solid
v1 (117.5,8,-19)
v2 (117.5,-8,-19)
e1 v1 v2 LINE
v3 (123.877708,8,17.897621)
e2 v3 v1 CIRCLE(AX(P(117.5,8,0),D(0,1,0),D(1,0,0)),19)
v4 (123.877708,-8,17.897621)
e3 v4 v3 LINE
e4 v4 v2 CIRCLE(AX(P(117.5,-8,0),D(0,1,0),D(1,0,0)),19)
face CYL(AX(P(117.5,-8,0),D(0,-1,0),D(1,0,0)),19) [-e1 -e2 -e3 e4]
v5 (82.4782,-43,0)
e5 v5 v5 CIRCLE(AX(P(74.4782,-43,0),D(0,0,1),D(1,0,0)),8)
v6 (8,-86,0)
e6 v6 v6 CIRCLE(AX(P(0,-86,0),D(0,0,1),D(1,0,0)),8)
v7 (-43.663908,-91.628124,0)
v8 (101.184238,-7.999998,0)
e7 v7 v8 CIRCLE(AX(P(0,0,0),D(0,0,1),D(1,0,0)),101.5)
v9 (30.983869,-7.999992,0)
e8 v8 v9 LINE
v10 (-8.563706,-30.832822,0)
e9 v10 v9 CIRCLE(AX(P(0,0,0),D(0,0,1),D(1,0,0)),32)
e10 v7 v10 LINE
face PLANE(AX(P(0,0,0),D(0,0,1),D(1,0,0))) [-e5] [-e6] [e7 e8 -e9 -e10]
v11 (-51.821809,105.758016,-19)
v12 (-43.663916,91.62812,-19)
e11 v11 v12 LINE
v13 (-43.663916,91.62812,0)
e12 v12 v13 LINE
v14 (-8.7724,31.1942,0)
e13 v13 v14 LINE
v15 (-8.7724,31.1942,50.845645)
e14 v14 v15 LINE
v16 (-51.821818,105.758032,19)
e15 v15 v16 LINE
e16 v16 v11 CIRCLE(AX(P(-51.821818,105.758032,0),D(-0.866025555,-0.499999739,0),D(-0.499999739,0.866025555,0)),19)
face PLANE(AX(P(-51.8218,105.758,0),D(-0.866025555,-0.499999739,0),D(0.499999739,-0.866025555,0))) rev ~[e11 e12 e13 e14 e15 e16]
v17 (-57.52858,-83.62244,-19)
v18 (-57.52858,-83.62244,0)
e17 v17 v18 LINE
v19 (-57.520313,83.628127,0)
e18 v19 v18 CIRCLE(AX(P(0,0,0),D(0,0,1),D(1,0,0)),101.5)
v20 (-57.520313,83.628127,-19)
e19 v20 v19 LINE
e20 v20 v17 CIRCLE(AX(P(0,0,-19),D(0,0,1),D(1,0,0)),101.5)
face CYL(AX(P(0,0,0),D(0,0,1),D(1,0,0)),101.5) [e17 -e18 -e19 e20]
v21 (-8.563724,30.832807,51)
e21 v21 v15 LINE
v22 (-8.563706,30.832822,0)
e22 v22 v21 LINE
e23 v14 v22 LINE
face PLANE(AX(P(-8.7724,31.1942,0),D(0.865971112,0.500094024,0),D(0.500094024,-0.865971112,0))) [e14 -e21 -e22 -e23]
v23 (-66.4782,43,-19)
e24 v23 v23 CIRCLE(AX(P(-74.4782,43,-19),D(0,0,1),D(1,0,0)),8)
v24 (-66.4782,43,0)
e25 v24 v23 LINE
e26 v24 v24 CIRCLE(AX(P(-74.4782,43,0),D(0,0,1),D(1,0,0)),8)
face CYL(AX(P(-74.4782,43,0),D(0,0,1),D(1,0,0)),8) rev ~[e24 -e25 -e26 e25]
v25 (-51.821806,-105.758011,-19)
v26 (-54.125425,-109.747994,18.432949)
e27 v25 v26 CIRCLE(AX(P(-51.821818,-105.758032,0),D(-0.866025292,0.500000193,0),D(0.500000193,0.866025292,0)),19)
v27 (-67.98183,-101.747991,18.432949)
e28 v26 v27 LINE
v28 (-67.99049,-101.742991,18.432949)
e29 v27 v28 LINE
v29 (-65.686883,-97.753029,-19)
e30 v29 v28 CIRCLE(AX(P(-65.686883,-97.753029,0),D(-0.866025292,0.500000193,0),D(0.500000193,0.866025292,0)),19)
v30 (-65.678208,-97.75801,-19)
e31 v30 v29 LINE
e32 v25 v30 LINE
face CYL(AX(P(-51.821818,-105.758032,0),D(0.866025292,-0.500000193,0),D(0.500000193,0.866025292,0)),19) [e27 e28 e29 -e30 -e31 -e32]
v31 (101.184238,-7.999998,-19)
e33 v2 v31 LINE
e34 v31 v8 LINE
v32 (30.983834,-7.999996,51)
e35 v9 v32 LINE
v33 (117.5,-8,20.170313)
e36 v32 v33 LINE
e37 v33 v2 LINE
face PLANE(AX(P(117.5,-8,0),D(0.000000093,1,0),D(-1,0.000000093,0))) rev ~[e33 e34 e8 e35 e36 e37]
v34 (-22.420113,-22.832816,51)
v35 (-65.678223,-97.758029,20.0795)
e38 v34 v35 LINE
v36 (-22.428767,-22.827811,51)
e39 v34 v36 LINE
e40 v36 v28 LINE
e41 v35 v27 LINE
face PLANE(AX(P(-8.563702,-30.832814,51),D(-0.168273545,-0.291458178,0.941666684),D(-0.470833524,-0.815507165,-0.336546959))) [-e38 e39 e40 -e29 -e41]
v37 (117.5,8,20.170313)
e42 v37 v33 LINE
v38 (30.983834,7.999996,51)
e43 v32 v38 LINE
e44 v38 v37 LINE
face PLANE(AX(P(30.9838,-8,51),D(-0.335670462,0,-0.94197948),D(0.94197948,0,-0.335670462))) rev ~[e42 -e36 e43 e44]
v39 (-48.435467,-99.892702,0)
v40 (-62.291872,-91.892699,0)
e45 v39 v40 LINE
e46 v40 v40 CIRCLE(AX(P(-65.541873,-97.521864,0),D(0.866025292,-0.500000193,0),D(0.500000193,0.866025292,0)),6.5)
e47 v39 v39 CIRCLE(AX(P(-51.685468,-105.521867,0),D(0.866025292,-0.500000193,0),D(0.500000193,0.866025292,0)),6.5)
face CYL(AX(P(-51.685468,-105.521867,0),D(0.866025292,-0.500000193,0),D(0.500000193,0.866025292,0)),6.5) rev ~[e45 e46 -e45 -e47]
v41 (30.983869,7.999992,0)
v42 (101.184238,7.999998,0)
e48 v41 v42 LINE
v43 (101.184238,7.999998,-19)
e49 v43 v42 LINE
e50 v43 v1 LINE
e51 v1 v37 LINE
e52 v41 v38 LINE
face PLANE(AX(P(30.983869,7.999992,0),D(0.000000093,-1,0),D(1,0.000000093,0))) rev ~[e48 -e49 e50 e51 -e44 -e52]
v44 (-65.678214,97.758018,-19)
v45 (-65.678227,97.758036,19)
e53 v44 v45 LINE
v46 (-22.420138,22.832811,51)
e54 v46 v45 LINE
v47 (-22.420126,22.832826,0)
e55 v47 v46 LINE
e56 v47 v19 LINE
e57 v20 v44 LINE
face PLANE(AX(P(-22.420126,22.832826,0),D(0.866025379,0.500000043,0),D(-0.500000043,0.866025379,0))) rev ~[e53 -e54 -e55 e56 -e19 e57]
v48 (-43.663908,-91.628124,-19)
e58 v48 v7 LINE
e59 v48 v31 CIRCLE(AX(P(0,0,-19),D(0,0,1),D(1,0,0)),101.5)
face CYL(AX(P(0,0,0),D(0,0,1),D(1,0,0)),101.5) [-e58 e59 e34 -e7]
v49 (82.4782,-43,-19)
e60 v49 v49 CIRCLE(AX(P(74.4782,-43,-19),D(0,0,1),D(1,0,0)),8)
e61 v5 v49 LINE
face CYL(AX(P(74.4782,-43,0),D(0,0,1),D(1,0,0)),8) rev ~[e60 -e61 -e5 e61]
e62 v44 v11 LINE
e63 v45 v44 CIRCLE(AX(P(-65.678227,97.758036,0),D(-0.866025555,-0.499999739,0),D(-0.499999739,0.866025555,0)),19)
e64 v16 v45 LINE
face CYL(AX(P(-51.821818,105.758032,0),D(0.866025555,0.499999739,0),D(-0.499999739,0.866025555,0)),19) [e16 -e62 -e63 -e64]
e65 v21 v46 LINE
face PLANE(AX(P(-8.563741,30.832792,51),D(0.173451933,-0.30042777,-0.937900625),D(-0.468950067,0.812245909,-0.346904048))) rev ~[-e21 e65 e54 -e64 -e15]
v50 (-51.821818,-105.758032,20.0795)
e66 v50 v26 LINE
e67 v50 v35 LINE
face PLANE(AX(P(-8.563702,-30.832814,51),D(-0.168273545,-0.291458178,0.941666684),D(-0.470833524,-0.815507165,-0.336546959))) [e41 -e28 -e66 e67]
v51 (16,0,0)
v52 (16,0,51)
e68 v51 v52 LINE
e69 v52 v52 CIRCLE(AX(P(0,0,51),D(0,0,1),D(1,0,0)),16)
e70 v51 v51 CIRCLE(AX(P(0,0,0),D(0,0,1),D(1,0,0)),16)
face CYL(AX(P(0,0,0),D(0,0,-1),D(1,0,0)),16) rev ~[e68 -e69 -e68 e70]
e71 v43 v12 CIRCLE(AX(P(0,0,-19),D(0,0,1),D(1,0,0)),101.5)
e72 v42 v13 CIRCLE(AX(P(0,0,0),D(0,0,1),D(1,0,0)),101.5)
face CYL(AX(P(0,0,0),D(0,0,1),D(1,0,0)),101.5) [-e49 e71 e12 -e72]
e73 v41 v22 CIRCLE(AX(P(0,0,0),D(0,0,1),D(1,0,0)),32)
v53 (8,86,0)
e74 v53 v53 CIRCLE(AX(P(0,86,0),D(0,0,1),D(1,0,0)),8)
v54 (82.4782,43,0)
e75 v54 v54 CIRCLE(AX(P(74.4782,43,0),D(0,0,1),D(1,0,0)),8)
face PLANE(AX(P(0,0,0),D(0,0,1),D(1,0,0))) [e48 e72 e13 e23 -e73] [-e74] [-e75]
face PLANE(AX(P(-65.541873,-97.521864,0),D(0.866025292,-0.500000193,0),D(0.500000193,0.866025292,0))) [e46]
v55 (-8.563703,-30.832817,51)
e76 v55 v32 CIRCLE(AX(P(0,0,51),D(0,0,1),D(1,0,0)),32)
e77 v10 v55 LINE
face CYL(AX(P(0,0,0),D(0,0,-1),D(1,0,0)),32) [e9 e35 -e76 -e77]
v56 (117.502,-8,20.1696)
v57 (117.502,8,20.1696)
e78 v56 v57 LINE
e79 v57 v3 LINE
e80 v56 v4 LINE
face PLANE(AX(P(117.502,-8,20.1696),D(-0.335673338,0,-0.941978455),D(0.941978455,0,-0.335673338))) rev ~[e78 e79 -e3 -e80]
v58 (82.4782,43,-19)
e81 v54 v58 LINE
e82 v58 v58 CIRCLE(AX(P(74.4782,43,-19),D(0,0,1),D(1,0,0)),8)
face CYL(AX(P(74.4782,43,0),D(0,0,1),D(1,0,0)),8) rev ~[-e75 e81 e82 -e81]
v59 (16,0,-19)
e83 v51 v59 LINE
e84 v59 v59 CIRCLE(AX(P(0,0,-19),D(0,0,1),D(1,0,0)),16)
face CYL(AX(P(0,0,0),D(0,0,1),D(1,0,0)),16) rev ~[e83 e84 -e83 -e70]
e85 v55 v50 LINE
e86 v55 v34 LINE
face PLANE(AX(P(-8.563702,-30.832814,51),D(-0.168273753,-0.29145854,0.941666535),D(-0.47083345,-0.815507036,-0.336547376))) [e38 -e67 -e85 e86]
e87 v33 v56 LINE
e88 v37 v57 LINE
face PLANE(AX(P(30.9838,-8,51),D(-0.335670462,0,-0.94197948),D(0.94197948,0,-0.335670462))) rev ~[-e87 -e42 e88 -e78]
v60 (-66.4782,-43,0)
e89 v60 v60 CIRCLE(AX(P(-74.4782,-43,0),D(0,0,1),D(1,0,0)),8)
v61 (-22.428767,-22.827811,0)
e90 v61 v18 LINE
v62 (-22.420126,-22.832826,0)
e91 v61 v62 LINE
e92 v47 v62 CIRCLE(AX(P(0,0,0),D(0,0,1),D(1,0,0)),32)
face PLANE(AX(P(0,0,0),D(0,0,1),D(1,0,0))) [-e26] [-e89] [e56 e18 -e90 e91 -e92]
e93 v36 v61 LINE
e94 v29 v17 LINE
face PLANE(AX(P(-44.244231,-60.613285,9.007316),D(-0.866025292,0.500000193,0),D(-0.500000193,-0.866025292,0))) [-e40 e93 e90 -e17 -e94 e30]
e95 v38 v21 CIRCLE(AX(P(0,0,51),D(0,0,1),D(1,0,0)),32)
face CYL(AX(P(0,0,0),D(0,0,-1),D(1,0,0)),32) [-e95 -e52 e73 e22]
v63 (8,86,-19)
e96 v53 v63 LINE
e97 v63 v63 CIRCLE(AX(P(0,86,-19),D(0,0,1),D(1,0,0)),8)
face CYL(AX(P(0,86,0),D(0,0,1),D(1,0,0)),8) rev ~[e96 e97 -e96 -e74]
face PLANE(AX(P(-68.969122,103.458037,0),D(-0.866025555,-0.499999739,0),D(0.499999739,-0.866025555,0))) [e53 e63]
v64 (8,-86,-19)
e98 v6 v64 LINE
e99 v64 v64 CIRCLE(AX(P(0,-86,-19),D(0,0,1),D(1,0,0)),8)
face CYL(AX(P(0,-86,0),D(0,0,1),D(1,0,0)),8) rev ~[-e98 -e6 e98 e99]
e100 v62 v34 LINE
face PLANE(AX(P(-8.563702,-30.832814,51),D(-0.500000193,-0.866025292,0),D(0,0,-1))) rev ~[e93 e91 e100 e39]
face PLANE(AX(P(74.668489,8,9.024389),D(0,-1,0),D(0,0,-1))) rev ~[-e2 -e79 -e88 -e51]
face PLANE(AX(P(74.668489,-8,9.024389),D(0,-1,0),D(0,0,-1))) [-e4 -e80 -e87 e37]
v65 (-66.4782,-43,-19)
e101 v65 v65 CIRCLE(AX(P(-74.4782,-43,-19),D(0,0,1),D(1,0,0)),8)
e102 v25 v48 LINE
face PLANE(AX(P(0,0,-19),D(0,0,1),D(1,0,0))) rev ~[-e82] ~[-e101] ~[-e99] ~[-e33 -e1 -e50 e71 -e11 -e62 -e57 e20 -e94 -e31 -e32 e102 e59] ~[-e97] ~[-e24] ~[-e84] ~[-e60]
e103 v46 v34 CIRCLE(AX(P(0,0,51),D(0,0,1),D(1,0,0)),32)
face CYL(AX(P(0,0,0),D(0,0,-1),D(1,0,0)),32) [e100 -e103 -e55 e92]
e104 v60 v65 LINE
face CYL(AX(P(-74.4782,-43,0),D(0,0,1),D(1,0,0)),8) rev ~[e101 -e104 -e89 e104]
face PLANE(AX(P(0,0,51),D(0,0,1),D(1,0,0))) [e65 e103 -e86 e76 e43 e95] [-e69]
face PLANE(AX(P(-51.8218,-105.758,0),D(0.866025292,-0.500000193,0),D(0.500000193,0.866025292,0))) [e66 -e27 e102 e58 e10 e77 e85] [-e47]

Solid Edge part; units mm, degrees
sketch "Sketch1" plane through (0, 0, 0) normal (0, 0, 1) x (1, 0, 0)
  circle A0 centre (0, 0) radius 101.5
extrude "Protrusion1" add sketch "Sketch1" against normal blind 19
sketch "Sketch2" plane through (0, 0, 0) normal (0, 0, 1) x (1, 0, 0)
  circle A0 centre (0, 0) radius 32
extrude "ExtrudedProtrusion_2" add sketch "Sketch2" along normal blind 51
sketch "Sketch3" plane through (0, 0, 0) normal (0, 0, 1) x (1, 0, 0)
  circle A0 centre (0, 0) radius 16
extrude "ExtrudedCutout_1" cut sketch "Sketch3" along normal blind 51
sketch "Sketch4" plane through (0, 0, 0) normal (0, 0, 1) x (1, 0, 0)
  circle A0 centre (0, 0) radius 16
extrude "ExtrudedCutout_2" cut sketch "Sketch4" against normal blind 19
sketch "Sketch5" plane through (0, 0, 0) normal (0, 0, 1) x (1, 0, 0)
  circle A0 centre (0, 86) radius 8
extrude "ExtrudedCutout_3" cut sketch "Sketch5" against normal blind 19
sketch "Sketch6" plane through (0, 0, 0) normal (0, 0, 1) x (1, 0, 0)
  circle A0 centre (74.4782, 43) radius 8
  circle A1 centre (74.4782, -43) radius 8
  circle A2 centre (0, -86) radius 8
  circle A3 centre (-74.4782, -43) radius 8
  circle A4 centre (-74.4782, 43) radius 8
  circle A5 centre (0, 86) radius 8
extrude "ExtrudedCutout_4" cut sketch "Sketch6" against normal blind 19
sketch "Sketch7" plane through (0, 0, 0) normal (0, 0, 1) x (0, 1, 0)
  line L0 (-105.758, 51.8218) -> (-30.8328, 8.5637)
  arc A0 (-30.8328, 8.5637) -> (-22.8328, 22.4201) centre (0, 0) cw
  line L1 (-22.8328, 22.4201) -> (-97.758, 65.6782)
  line L2 (-101.758, 58.75) -> (-97.758, 65.6782)
  line L3 (-101.758, 58.75) -> (-105.758, 51.8218)
  line L4 (105.758, 51.8218) -> (31.1942, 8.7724)
  line L5 (31.1942, 8.7724) -> (30.8328, 8.5637)
  arc A1 (22.8328, 22.4201) -> (30.8328, 8.5637) centre (0, 0) cw
  line L6 (22.8328, 22.4201) -> (97.758, 65.6782)
  line L7 (97.758, 65.6782) -> (105.758, 51.8218)
  line L8 (8, -30.9839) -> (8, -117.5)
  line L9 (0, -117.5) -> (8, -117.5)
  line L10 (0, -117.5) -> (-8, -117.5)
  line L11 (-8, -117.5) -> (-8, -30.9839)
  arc A2 (8, -30.9839) -> (-8, -30.9839) centre (0, 0) cw
extrude "ExtrudedProtrusion_5" add sketch "Sketch7" along normal blind 51
sketch "Sketch8" plane through (0, 0, 0) normal (0, 0, 1) x (0, 1, 0)
  line L0 (-105.758, 51.8218) -> (-30.8328, 8.5637)
  arc A0 (-30.8328, 8.5637) -> (-22.8328, 22.4201) centre (0, 0) cw
  line L1 (-22.8328, 22.4201) -> (-97.758, 65.6782)
  line L2 (-101.758, 58.75) -> (-97.758, 65.6782)
  line L3 (-101.758, 58.75) -> (-105.758, 51.8218)
  line L4 (-8, -117.5) -> (-8, -30.9839)
  line L5 (8, -30.9839) -> (8, -117.5)
  line L6 (0, -117.5) -> (8, -117.5)
  line L7 (0, -117.5) -> (-8, -117.5)
  arc A1 (8, -30.9839) -> (-8, -30.9839) centre (0, 0) cw
  line L8 (105.758, 51.8218) -> (31.1942, 8.7724)
  line L9 (31.1942, 8.7724) -> (30.8328, 8.5637)
  arc A2 (22.8328, 22.4201) -> (30.8328, 8.5637) centre (0, 0) cw
  line L10 (22.8328, 22.4201) -> (97.758, 65.6782)
  line L11 (97.758, 65.6782) -> (105.758, 51.8218)
extrude "ExtrudedProtrusion_6" add sketch "Sketch8" against normal blind 19
sketch "Sketch9" plane through (-30.1928, -68.2954, 16) normal (0.8660254, -0.5, 0) x (0.5, 0.8660254, 0)
  line L0 (-43.2581, 35) -> (43.2581, 35)
  line L1 (43.2581, 35) -> (-43.2581, 4.0795)
  line L2 (-43.2581, 4.0795) -> (-43.2581, 35)
extrude "ExtrudedCutout_5" cut sketch "Sketch9" against normal blind 16
sketch "Sketch10" plane through (-30.1928, -68.2954, 16) normal (0.8660254, -0.5, 0) x (0.5, 0.8660254, 0)
  arc A0 (-43.2581, -35) -> (-47.8653, 2.4329) centre (-43.2581, -16) cw
  line L0 (43.2581, 35) -> (-47.8653, 2.4329)
  line L1 (-43.2581, -35) -> (43.2581, -35)
  line L2 (43.2581, 35) -> (43.2581, -35)
extrude "ExtrudedProtrusion_7" add sketch "Sketch10" against normal blind 16
extrude "Cutout1" [suppressed]
extrude "ExtrudedCutout_7" [suppressed]
sketch "Sketch11" plane through (74.2419, -8, 16) normal (0, -1, 0) x (1, 0, 0)
  line L0 (-43.2581, -35) -> (43.2581, -35)
  line L1 (-43.2581, 35) -> (-43.2581, -35)
  line L2 (-43.2581, 35) -> (43.2601, 4.1696)
  line L3 (43.2601, 4.1696) -> (49.6358, 1.8976)
  arc A0 (49.6358, 1.8976) -> (43.2581, -35) centre (43.2581, -16) cw
extrude "Protrusion2" add sketch "Sketch11" against normal blind 16
sketch "Sketch12" plane through (74.2419, -8, 16) normal (0, -1, 0) x (1, 0, 0)
  line L0 (-43.2581, 35) -> (43.2581, 35)
  line L1 (43.2581, 35) -> (43.2601, 4.1696)
  line L2 (-43.2581, 35) -> (43.2601, 4.1696)
extrude "ExtrudedCutout_8" cut sketch "Sketch12" against normal blind 16
extrude "Cutout2" [suppressed]
sketch "Sketch13" plane through (-30.1928, -68.2954, 16) normal (0.8660254, -0.5, 0) x (0.5, 0.8660254, 0)
  arc A0 (-43.2581, -35) -> (-47.8653, 2.4329) centre (-43.2581, -16) cw
  line L0 (43.2581, 35) -> (-47.8653, 2.4329)
  line L1 (-43.2581, -35) -> (43.2581, -35)
  line L2 (43.2581, 35) -> (43.2581, -35)
extrude "ExtrudedProtrusion_13" add sketch "Sketch13" against normal blind 16.01
sketch "Sketch14" plane through (-30.1928, -68.2954, 16) normal (0.8660254, -0.5, 0) x (0.5, 0.8660254, 0)
  circle A0 centre (-42.9854, -16) radius 6.5
extrude "Cutout3" cut sketch "Sketch14" against normal blind 16
sketch "Sketch15" plane through (-30.1928, 68.2954, 16) normal (0.8660254, 0.5, 0) x (-0.5, 0.8660254, 0)
  line L0 (43.2581, -35) -> (43.2581, 3)
  arc A0 (43.2581, 3) -> (43.2581, -35) centre (43.2581, -16) cw
extrude "ExtrudedProtrusion_14" add sketch "Sketch15" against normal blind 16
sketch "Sketch16" plane through (-30.1928, 68.2954, 16) normal (0.8660254, 0.5, 0) x (-0.5, 0.8660254, 0)
  line L0 (43.2581, 35) -> (-43.2581, 35)
  line L1 (-43.2581, 35) -> (43.2581, 3)
  line L2 (43.2581, 3) -> (43.2581, 35)
extrude "Cutout4" cut sketch "Sketch16" against normal blind 16
